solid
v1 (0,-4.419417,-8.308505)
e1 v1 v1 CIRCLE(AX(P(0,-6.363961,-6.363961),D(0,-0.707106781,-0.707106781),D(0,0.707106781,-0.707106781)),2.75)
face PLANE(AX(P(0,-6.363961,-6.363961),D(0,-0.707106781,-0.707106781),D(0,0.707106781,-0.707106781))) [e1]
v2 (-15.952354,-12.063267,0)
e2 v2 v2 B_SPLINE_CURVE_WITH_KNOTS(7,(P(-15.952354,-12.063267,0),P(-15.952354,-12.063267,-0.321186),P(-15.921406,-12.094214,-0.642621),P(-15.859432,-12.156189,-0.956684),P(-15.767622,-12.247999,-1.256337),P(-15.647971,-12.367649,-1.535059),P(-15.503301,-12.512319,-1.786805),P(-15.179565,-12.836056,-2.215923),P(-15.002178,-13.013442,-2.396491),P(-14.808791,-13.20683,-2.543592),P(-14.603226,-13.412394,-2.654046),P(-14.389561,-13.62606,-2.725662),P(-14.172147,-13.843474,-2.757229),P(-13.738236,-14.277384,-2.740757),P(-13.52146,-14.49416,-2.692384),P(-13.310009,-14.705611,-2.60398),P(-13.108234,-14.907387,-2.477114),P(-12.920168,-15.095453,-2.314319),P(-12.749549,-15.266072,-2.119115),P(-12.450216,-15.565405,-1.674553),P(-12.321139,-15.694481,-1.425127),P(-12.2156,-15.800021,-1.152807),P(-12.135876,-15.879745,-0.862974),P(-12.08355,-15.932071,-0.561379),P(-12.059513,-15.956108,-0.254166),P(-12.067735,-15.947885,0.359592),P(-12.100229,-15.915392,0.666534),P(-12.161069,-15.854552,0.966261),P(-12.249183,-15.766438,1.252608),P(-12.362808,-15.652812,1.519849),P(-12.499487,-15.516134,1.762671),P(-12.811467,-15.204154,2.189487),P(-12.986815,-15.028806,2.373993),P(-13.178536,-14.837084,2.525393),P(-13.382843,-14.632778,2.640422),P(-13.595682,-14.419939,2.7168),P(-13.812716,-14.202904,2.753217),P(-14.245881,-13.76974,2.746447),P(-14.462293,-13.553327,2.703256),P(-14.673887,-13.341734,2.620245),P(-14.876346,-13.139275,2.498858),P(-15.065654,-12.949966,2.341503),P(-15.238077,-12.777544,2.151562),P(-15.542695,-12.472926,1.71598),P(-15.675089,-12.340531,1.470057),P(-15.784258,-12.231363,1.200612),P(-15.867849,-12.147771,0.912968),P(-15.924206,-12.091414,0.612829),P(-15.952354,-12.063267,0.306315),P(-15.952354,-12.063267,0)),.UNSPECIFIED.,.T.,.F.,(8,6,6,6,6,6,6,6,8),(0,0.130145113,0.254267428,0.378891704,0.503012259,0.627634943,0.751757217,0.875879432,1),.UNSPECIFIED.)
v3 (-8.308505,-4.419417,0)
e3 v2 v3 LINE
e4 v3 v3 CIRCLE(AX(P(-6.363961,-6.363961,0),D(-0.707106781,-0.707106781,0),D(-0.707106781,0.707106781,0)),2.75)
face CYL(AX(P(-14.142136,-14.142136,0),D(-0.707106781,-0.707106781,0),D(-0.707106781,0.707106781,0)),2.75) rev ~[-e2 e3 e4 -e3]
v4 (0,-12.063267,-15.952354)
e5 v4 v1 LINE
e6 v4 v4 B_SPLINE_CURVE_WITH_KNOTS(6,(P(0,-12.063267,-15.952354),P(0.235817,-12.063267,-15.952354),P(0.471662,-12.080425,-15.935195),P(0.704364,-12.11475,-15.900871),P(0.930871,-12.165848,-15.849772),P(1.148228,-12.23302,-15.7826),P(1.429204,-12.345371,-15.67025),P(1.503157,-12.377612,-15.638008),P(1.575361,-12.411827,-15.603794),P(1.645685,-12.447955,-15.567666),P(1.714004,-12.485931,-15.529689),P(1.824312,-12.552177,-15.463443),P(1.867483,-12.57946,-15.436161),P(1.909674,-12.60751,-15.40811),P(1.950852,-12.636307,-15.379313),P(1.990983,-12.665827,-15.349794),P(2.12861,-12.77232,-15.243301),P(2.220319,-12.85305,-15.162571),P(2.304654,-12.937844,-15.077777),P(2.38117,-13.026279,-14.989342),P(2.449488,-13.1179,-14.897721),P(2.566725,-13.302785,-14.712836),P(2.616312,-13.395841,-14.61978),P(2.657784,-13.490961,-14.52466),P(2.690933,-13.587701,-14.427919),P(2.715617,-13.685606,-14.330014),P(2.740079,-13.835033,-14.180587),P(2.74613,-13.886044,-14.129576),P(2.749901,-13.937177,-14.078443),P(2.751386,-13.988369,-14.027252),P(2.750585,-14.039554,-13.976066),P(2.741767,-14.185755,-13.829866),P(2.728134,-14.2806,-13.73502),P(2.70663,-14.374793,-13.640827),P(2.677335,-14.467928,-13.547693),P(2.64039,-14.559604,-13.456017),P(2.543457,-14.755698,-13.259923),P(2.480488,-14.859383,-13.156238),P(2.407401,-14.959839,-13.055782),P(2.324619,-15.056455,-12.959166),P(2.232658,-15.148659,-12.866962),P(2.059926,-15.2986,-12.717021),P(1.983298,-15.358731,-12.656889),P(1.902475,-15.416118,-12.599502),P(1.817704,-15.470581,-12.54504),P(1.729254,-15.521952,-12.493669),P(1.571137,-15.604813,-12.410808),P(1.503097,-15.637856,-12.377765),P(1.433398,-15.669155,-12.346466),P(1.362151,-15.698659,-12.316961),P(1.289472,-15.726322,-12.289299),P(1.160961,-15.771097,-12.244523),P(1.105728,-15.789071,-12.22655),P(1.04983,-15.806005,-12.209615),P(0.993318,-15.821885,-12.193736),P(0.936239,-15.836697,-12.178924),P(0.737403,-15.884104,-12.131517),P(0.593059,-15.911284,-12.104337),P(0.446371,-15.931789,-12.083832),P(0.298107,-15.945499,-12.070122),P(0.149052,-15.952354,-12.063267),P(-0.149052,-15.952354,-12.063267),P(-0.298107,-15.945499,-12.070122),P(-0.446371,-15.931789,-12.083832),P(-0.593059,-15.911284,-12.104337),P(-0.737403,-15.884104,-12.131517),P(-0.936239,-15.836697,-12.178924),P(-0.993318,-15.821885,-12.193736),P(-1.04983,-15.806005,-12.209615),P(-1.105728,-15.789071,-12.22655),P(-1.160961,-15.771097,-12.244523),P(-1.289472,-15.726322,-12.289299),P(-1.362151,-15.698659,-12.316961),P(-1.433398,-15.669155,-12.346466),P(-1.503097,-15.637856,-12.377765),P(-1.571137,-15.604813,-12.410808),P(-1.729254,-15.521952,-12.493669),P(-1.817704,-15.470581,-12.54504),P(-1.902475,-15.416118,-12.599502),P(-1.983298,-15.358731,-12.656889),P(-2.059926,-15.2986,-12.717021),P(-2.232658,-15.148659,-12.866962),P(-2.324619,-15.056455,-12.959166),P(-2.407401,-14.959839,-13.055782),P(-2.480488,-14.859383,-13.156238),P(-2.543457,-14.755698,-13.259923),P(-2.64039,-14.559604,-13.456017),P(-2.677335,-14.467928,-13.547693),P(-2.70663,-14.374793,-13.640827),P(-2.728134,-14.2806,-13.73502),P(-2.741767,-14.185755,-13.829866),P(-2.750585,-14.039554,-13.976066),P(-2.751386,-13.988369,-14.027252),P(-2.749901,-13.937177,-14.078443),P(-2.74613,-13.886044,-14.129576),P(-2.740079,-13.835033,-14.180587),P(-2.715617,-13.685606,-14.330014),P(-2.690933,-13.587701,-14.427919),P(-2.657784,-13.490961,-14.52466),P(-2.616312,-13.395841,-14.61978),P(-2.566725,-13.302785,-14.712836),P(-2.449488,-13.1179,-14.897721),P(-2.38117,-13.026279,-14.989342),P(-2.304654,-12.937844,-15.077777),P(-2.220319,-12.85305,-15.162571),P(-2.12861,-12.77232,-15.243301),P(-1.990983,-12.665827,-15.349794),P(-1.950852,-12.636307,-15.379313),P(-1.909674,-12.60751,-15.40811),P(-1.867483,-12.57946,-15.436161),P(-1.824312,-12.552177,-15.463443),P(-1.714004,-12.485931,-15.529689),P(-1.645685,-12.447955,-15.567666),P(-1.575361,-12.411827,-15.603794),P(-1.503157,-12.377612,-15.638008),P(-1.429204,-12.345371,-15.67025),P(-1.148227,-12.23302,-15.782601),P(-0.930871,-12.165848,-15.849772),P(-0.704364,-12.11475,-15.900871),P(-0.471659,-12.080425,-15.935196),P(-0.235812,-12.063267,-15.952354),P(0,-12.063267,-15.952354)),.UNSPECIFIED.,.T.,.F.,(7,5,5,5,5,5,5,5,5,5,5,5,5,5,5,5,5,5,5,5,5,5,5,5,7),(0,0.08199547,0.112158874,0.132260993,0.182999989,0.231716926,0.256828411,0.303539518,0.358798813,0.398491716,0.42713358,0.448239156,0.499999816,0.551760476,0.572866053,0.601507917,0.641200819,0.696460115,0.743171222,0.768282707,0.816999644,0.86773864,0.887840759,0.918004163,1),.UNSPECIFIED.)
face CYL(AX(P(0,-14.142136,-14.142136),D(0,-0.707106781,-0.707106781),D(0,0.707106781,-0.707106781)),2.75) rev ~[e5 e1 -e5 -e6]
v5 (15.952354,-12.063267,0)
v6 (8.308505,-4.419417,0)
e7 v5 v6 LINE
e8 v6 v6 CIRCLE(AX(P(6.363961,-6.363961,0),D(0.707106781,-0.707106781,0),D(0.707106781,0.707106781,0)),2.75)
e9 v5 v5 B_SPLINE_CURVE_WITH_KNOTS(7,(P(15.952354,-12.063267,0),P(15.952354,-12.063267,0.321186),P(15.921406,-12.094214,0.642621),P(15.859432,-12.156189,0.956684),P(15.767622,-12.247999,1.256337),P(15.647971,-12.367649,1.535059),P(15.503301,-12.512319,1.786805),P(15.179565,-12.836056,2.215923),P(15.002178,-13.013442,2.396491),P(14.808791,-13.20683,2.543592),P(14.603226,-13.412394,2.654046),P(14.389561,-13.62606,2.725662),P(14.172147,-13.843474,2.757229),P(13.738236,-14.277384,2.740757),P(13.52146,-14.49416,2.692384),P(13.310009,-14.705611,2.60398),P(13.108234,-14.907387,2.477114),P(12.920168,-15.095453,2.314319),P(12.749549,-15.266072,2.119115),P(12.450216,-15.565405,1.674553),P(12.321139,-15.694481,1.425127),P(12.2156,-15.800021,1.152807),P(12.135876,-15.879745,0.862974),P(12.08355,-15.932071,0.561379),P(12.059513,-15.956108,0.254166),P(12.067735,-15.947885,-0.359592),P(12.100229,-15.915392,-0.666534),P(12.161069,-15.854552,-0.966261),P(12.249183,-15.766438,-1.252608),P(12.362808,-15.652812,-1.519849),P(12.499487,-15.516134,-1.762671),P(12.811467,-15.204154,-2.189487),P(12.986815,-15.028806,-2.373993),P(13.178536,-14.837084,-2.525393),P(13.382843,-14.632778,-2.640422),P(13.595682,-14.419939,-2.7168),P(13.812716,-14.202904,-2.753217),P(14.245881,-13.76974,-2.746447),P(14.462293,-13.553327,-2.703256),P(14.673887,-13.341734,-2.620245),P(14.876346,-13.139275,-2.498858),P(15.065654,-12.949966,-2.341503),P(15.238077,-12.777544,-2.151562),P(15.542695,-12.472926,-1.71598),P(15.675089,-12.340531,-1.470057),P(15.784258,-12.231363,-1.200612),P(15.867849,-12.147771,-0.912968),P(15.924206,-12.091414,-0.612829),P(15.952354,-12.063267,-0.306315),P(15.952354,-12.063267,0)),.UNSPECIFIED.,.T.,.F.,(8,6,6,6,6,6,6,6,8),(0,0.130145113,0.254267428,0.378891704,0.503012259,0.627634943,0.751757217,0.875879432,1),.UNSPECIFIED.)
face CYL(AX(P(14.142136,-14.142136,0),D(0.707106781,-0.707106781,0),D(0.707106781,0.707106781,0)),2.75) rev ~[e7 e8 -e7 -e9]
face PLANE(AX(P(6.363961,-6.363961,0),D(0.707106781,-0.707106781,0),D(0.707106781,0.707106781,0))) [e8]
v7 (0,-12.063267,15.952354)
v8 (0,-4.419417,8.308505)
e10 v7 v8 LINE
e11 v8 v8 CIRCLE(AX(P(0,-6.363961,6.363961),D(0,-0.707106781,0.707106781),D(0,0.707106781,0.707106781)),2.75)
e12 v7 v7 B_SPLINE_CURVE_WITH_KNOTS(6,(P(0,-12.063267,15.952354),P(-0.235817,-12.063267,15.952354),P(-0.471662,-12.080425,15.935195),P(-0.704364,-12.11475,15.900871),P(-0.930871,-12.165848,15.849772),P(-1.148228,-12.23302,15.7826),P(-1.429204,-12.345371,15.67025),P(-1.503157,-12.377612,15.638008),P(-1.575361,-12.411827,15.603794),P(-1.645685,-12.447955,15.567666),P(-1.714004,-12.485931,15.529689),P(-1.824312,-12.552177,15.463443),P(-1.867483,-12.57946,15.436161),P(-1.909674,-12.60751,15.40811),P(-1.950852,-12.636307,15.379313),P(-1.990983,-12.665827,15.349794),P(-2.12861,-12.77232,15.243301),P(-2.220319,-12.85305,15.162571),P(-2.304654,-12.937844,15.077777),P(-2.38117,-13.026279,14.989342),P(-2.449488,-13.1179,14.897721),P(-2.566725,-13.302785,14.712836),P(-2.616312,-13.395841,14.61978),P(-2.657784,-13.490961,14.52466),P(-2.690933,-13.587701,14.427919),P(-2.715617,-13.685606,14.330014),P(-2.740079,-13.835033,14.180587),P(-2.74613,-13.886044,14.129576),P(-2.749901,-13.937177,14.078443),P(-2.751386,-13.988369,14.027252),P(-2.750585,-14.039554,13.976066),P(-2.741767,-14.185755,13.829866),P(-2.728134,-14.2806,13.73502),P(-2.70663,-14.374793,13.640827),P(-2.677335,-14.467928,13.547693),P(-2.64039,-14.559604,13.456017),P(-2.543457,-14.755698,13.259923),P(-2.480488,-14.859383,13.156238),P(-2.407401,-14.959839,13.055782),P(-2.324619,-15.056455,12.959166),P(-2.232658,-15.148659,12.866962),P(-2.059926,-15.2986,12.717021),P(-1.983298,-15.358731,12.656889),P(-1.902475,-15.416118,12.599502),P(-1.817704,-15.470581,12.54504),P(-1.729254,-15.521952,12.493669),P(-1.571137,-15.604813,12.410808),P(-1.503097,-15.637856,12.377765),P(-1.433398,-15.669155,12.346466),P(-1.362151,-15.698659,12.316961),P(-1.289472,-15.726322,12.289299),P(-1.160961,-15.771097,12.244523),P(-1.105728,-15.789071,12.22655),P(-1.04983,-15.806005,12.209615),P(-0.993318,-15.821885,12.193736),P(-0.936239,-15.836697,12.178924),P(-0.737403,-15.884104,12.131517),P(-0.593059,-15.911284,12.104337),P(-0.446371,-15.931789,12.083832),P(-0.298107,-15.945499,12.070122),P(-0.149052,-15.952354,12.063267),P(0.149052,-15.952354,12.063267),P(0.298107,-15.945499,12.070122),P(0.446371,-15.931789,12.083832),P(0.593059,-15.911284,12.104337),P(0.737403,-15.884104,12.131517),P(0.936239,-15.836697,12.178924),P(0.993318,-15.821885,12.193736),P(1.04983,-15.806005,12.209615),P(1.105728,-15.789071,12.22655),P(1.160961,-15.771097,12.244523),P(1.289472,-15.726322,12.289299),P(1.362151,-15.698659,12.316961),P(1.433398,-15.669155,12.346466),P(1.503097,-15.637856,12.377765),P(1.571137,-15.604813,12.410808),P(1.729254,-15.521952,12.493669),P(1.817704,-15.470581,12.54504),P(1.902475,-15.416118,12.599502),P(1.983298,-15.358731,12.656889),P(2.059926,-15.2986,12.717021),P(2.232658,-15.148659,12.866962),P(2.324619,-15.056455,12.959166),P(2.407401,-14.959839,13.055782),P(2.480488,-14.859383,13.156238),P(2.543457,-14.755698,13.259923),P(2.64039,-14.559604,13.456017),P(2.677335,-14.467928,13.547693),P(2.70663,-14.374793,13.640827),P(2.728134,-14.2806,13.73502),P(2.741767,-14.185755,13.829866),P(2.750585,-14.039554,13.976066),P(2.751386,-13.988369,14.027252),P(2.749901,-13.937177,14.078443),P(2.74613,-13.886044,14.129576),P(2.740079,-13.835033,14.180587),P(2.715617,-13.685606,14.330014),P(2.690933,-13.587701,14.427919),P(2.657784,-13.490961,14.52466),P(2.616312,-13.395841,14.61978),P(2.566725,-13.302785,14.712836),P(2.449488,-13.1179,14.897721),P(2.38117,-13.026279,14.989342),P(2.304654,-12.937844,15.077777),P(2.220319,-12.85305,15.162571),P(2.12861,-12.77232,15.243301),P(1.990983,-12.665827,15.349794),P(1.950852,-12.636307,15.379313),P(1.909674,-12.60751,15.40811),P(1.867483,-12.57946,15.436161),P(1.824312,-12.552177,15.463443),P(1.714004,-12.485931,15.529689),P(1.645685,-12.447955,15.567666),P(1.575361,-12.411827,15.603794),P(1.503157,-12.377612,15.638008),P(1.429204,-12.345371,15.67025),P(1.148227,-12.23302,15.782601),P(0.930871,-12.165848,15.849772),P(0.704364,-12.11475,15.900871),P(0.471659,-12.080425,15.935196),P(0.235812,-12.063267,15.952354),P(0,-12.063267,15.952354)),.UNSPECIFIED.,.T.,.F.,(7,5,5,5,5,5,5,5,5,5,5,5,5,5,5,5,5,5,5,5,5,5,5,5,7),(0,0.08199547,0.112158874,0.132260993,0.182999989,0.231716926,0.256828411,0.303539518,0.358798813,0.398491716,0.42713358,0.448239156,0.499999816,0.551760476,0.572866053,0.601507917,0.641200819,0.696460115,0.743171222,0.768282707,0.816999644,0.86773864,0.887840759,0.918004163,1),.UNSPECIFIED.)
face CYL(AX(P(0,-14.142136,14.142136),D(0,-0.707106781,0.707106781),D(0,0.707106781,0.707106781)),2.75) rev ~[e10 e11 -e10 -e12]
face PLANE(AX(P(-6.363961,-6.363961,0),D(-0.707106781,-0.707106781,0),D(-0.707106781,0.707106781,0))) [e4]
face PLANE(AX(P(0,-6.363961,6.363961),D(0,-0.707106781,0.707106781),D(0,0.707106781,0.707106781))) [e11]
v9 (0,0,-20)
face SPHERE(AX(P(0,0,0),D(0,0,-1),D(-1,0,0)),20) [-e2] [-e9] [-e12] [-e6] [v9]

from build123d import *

# Parameters (mm, degrees)
F5_R            = 2.75
F6_DEPTH        = 11
F6_COPIES_COUNT = 4


# Not quite as in the source:
# - a pattern or mirror of a feature is missing from the dataset's text; its kind, count and spacing are read off the source's solid


with BuildPart() as f2:
    # F1 (on Front) → F2 (revolve)
    with BuildSketch(Plane.XZ):
        with BuildLine():
            ThreePointArc((0, 20), (-20, 0), (0, -20))
            Line((0, -20), (0, 20))
        make_face()
    revolve(axis=Axis((0, 0, 0), (0, 0, -1)))

    # F5 (on line) → F6 (cut)
    with BuildSketch(Plane(origin=(14.1421356237, -14.1421356237, 0), x_dir=(0.7071067812, 0.7071067812, 0), z_dir=(0.7071067812, -0.7071067812, 0))):
        Circle(F5_R)
    f6 = extrude(amount=-F6_DEPTH, mode=Mode.SUBTRACT)

    # F6_copies: F6 ×4 about axis
    f6_copies_axis = Axis((0, 0, 0), (0, 1, 0))
    for i in range(1, F6_COPIES_COUNT):
        add(f6.rotate(f6_copies_axis, i * 360 / F6_COPIES_COUNT), mode=Mode.SUBTRACT)


solid = f2.part
